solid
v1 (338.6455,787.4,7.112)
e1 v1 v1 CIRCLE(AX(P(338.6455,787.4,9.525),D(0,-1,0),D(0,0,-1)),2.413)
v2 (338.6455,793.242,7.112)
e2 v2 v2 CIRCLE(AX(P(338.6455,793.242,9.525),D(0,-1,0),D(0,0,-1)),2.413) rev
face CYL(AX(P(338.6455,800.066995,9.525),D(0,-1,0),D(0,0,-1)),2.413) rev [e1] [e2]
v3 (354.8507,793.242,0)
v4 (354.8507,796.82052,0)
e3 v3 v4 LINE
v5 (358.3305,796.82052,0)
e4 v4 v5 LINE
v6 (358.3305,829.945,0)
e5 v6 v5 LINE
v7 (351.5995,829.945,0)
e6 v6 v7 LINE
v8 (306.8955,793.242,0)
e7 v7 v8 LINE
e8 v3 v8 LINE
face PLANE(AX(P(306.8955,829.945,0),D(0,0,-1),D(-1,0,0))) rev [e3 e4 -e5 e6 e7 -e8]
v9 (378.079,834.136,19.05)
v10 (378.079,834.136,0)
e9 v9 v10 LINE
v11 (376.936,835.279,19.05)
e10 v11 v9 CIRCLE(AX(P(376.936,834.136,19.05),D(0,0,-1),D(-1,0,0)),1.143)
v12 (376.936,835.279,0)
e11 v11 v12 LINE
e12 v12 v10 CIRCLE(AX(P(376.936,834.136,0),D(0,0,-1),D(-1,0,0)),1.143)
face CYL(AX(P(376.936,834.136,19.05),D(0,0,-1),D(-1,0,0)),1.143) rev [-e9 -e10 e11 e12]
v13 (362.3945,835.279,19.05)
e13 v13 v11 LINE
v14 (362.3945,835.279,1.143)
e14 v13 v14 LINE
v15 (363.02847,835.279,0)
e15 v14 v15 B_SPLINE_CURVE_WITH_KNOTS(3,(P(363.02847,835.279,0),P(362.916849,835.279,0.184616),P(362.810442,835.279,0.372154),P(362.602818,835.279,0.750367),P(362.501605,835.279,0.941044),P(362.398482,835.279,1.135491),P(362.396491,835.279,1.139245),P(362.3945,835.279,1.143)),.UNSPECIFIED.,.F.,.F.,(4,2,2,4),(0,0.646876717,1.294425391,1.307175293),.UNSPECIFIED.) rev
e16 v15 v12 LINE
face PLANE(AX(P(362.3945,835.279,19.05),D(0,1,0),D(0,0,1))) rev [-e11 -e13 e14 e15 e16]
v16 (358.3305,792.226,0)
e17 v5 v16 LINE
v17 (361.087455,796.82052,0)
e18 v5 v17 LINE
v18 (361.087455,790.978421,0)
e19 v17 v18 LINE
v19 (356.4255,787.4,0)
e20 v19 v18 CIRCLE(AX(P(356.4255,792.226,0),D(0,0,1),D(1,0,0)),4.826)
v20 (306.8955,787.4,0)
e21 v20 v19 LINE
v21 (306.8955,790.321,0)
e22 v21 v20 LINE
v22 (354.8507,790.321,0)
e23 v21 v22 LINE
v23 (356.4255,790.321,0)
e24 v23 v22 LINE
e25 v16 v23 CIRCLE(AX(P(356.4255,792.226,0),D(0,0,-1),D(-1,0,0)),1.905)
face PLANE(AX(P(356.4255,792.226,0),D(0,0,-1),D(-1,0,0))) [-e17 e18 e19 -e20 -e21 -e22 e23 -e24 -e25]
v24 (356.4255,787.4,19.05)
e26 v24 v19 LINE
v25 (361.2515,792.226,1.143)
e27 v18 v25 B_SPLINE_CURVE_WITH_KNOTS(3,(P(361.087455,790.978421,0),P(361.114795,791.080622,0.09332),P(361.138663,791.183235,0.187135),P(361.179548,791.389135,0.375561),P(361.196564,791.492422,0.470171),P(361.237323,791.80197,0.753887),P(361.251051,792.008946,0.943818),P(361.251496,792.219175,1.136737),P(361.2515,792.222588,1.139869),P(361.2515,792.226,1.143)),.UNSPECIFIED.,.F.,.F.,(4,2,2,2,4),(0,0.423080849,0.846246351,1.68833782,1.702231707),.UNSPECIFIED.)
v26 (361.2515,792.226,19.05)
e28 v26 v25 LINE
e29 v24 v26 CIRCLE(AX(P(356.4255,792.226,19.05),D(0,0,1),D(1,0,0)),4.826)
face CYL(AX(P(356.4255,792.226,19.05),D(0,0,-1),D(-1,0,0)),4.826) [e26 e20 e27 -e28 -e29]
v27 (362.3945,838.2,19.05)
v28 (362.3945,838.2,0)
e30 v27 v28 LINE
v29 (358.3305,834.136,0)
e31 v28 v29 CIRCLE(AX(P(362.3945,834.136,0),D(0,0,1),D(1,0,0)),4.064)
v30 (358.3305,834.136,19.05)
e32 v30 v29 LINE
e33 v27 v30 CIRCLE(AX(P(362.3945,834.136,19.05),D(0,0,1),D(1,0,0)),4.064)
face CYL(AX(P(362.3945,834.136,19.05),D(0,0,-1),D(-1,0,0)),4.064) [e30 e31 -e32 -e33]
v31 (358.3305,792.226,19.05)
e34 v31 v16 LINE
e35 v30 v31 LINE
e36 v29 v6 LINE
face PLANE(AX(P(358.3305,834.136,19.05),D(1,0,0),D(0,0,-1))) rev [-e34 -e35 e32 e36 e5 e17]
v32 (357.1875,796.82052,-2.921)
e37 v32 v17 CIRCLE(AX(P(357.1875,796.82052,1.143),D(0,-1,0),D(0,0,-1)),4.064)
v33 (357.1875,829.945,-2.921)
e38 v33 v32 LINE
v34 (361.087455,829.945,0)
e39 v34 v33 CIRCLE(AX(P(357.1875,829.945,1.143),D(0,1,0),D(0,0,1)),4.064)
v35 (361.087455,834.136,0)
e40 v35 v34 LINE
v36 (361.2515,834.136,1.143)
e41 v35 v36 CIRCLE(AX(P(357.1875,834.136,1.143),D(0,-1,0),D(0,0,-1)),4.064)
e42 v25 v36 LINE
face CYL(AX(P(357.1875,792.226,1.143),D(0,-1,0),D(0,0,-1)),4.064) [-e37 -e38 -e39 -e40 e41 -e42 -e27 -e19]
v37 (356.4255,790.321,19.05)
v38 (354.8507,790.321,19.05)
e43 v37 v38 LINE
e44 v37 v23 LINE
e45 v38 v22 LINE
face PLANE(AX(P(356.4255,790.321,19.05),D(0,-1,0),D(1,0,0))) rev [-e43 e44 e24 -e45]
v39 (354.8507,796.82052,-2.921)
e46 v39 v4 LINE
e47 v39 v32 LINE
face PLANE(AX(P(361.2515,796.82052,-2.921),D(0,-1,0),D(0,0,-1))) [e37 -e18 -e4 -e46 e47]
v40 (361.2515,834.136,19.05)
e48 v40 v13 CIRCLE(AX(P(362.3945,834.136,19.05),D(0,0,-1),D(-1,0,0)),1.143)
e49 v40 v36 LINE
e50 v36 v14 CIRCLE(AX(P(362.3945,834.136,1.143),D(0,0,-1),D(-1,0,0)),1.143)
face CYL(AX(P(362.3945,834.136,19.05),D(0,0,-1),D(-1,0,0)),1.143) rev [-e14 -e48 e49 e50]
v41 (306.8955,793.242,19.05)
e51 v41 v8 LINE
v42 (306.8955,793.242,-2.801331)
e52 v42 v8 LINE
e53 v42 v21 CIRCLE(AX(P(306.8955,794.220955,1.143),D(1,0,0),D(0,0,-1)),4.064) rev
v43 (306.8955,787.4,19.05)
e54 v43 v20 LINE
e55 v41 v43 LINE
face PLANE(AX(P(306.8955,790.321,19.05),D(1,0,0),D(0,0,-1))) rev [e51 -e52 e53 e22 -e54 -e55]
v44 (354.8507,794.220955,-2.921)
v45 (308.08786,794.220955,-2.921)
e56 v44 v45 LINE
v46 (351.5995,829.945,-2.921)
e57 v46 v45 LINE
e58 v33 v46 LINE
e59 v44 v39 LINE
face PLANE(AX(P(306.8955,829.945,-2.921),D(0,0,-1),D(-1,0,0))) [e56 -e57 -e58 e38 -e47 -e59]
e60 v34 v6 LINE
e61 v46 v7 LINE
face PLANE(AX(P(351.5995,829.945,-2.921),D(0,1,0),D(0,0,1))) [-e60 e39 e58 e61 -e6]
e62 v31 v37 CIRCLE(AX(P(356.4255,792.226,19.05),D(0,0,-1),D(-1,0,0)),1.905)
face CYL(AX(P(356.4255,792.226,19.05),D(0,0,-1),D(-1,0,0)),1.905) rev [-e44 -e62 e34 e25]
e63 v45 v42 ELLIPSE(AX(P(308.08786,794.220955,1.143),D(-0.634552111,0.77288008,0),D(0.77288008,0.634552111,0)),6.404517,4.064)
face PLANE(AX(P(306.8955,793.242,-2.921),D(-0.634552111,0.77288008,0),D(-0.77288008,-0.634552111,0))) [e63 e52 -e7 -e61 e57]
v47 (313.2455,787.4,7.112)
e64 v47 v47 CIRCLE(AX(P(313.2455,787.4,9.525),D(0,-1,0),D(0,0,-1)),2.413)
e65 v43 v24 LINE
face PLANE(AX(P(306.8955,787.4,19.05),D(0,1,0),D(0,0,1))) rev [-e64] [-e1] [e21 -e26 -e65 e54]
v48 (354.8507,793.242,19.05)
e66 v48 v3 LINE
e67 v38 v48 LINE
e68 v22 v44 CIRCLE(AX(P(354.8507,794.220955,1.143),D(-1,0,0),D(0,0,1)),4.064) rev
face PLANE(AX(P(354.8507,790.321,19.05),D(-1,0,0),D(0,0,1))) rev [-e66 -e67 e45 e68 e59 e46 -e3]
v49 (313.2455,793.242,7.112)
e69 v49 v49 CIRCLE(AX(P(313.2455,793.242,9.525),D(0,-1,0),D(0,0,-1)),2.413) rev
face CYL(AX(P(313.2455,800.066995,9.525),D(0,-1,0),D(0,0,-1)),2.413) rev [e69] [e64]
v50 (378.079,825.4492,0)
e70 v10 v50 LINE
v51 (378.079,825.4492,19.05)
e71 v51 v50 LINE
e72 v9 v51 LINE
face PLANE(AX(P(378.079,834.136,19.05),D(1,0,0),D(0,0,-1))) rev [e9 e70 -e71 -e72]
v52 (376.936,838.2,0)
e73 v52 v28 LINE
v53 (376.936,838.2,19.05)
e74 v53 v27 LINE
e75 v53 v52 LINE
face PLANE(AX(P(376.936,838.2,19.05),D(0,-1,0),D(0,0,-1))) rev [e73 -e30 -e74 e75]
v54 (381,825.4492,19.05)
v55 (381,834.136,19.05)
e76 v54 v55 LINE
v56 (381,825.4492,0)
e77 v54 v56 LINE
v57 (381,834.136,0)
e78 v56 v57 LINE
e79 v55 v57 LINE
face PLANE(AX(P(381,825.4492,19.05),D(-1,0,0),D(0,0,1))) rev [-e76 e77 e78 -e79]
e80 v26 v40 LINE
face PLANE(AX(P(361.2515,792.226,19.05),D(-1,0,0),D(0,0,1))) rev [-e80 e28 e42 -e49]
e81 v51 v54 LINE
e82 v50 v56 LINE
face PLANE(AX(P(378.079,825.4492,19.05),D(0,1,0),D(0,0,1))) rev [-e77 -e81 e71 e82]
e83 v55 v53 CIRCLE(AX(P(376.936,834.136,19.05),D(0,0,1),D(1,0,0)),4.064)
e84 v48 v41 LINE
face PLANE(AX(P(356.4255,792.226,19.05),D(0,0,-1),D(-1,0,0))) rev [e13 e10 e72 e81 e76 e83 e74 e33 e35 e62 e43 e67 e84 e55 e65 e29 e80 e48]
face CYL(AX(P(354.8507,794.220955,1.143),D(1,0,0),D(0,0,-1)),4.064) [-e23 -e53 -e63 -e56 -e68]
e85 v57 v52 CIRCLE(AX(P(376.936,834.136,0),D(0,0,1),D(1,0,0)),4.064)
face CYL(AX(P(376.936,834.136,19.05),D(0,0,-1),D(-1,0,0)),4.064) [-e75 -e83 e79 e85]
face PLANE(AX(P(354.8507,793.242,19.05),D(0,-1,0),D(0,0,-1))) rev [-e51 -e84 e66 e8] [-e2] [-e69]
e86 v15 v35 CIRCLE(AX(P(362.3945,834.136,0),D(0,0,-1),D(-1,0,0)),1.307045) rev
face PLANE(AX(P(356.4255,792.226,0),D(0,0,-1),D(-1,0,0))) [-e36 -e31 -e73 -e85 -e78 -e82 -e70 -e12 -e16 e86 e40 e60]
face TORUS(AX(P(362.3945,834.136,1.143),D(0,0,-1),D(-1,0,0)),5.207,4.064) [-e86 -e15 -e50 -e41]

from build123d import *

# Parameters (mm, degrees)
EXTRUDE1_DEPTH     = 19.05
EXTRUDE4_DEPTH     = 2.921
SKETCH5_W          = 47.9552
SKETCH5_H          = 2.921
EXTRUDE5_DEPTH     = 19.05
FILLET1_R          = 4.064
FILLET2_START      = 790
FILLET2_2_DEPTH    = 44.1360001
SKETCH6_R          = 2.413
CUT_EXTRUDE1_DEPTH = 5.842


with BuildPart() as part:
    # Sketch2 → Extrude1 (new body)
    with BuildSketch(Plane.XY):
        with BuildLine():
            Line((356.4255, 790.321), (306.8955, 790.321))
            Line((306.8955, 790.321), (306.8955, 787.4))
            Line((306.8955, 787.4), (356.4255, 787.4))
            ThreePointArc((356.4255, 787.4), (359.837997326, 788.813502674), (361.2515, 792.226))
            Line((361.2515, 792.226), (361.2515, 834.136))
            ThreePointArc((361.2515, 834.136), (361.586276949, 834.944223051), (362.3945, 835.279))
            Line((362.3945, 835.279), (376.936, 835.279))
            ThreePointArc((376.936, 835.279), (377.744223051, 834.944223051), (378.079, 834.136))
            Line((378.079, 834.136), (378.079, 825.4492))
            Line((378.079, 825.4492), (381, 825.4492))
            Line((381, 825.4492), (381, 834.136))
            ThreePointArc((381, 834.136), (379.809681959, 837.009681959), (376.936, 838.2))
            Line((376.936, 838.2), (362.3945, 838.2))
            ThreePointArc((362.3945, 838.2), (359.520818041, 837.009681959), (358.3305, 834.136))
            Line((358.3305, 834.136), (358.3305, 792.226))
            ThreePointArc((358.3305, 792.226), (357.772538418, 790.878961582), (356.4255, 790.321))
        make_face()
    extrude(amount=EXTRUDE1_DEPTH)



with BuildPart() as body_2:
    # Sketch3 → Extrude4 (new body)
    with BuildSketch(Plane.XY):
        Polygon((306.8955, 793.242), (351.5995, 829.945), (361.2515, 829.945), (361.2515, 796.82051965), (354.8507, 796.82051965), (354.8507, 790.321), (306.8955, 790.321), align=None)
    extrude(amount=-EXTRUDE4_DEPTH)


with BuildPart() as part_1:
    add(part.part)

    add(body_2.part)  # Extrude5 merges body 2
    # Sketch5 → Extrude5 (add)
    with BuildSketch(Plane.XY):
        with Locations((330.8731, 791.7815)):
            Rectangle(SKETCH5_W, SKETCH5_H)
    extrude(amount=EXTRUDE5_DEPTH)

    # Fillet1
    # the kernel refuses this fillet: 4.064 mm, written as the material it takes off along each edge
    with BuildSketch(Plane(origin=(364.600586858, 790.321, -2.921), x_dir=(0, 0, 1), z_dir=(-1, 0, 0))) as fillet1_piece_1:
        with BuildLine():
            CenterArc((4.064, 3.899954743), FILLET1_R, 180, 73.665177219)
            Line((0, 3.899954743), (-0.08128, 3.899954743))
            Line((-0.08128, 3.899954743), (-0.08128, 0))
            Line((-0.08128, 0), (0, -0.08128))
            ThreePointArc((0, -0.08128), (1.4605, -0.08128), (2.89814, -0.077999095))
            Line((2.89814, -0.077999095), (2.921, 0))
        make_face()
    extrude(amount=67.454973717, mode=Mode.SUBTRACT)

    # Fillet2: read off the stored shape, not the designer's step
    # Fillet2 outline → Fillet2 (revolve, cut)
    with BuildSketch(Plane(origin=(362.3945, 834.136, 0), x_dir=(1, 0, 0), z_dir=(0, -1, 0))):
        with BuildLine():
            Line((1.143, 0), (1.307045257, 0))
            ThreePointArc((1.307045257, 0), (1.184220359, 0.565643991), (1.143, 1.143))
            Line((1.143, 1.143), (1.143, 0))
        make_face()
    revolve(axis=Axis((362.3945, 834.136, 0), (0, 0, 1)), mode=Mode.SUBTRACT)

    # Fillet2 2 outline → Fillet2 2 (cut)
    with BuildSketch(Plane(origin=(0, 0, 0), x_dir=(1, 0, 0), z_dir=(0, 1, 0)).offset(FILLET2_START)):
        with BuildLine():
            Line((361.2515, 2.921), (357.1875, 2.921))
            ThreePointArc((357.1875, 2.921), (360.061181959, 1.730681959), (361.2515, -1.143))
            Line((361.2515, -1.143), (361.2515, 2.921))
        make_face()
    extrude(amount=FILLET2_2_DEPTH, mode=Mode.SUBTRACT)

    # Sketch6 → Cut-Extrude1 (cut)
    with BuildSketch(Plane.XZ.offset(-787.4)):
        with Locations(Location((313.2455, 9.525, 0), (0, 0, 270))):
            Circle(SKETCH6_R)
        with Locations(Location((338.6455, 9.525, 0), (0, 0, 270))):
            Circle(SKETCH6_R)
    extrude(amount=-CUT_EXTRUDE1_DEPTH, mode=Mode.SUBTRACT)


solid = part_1.part
